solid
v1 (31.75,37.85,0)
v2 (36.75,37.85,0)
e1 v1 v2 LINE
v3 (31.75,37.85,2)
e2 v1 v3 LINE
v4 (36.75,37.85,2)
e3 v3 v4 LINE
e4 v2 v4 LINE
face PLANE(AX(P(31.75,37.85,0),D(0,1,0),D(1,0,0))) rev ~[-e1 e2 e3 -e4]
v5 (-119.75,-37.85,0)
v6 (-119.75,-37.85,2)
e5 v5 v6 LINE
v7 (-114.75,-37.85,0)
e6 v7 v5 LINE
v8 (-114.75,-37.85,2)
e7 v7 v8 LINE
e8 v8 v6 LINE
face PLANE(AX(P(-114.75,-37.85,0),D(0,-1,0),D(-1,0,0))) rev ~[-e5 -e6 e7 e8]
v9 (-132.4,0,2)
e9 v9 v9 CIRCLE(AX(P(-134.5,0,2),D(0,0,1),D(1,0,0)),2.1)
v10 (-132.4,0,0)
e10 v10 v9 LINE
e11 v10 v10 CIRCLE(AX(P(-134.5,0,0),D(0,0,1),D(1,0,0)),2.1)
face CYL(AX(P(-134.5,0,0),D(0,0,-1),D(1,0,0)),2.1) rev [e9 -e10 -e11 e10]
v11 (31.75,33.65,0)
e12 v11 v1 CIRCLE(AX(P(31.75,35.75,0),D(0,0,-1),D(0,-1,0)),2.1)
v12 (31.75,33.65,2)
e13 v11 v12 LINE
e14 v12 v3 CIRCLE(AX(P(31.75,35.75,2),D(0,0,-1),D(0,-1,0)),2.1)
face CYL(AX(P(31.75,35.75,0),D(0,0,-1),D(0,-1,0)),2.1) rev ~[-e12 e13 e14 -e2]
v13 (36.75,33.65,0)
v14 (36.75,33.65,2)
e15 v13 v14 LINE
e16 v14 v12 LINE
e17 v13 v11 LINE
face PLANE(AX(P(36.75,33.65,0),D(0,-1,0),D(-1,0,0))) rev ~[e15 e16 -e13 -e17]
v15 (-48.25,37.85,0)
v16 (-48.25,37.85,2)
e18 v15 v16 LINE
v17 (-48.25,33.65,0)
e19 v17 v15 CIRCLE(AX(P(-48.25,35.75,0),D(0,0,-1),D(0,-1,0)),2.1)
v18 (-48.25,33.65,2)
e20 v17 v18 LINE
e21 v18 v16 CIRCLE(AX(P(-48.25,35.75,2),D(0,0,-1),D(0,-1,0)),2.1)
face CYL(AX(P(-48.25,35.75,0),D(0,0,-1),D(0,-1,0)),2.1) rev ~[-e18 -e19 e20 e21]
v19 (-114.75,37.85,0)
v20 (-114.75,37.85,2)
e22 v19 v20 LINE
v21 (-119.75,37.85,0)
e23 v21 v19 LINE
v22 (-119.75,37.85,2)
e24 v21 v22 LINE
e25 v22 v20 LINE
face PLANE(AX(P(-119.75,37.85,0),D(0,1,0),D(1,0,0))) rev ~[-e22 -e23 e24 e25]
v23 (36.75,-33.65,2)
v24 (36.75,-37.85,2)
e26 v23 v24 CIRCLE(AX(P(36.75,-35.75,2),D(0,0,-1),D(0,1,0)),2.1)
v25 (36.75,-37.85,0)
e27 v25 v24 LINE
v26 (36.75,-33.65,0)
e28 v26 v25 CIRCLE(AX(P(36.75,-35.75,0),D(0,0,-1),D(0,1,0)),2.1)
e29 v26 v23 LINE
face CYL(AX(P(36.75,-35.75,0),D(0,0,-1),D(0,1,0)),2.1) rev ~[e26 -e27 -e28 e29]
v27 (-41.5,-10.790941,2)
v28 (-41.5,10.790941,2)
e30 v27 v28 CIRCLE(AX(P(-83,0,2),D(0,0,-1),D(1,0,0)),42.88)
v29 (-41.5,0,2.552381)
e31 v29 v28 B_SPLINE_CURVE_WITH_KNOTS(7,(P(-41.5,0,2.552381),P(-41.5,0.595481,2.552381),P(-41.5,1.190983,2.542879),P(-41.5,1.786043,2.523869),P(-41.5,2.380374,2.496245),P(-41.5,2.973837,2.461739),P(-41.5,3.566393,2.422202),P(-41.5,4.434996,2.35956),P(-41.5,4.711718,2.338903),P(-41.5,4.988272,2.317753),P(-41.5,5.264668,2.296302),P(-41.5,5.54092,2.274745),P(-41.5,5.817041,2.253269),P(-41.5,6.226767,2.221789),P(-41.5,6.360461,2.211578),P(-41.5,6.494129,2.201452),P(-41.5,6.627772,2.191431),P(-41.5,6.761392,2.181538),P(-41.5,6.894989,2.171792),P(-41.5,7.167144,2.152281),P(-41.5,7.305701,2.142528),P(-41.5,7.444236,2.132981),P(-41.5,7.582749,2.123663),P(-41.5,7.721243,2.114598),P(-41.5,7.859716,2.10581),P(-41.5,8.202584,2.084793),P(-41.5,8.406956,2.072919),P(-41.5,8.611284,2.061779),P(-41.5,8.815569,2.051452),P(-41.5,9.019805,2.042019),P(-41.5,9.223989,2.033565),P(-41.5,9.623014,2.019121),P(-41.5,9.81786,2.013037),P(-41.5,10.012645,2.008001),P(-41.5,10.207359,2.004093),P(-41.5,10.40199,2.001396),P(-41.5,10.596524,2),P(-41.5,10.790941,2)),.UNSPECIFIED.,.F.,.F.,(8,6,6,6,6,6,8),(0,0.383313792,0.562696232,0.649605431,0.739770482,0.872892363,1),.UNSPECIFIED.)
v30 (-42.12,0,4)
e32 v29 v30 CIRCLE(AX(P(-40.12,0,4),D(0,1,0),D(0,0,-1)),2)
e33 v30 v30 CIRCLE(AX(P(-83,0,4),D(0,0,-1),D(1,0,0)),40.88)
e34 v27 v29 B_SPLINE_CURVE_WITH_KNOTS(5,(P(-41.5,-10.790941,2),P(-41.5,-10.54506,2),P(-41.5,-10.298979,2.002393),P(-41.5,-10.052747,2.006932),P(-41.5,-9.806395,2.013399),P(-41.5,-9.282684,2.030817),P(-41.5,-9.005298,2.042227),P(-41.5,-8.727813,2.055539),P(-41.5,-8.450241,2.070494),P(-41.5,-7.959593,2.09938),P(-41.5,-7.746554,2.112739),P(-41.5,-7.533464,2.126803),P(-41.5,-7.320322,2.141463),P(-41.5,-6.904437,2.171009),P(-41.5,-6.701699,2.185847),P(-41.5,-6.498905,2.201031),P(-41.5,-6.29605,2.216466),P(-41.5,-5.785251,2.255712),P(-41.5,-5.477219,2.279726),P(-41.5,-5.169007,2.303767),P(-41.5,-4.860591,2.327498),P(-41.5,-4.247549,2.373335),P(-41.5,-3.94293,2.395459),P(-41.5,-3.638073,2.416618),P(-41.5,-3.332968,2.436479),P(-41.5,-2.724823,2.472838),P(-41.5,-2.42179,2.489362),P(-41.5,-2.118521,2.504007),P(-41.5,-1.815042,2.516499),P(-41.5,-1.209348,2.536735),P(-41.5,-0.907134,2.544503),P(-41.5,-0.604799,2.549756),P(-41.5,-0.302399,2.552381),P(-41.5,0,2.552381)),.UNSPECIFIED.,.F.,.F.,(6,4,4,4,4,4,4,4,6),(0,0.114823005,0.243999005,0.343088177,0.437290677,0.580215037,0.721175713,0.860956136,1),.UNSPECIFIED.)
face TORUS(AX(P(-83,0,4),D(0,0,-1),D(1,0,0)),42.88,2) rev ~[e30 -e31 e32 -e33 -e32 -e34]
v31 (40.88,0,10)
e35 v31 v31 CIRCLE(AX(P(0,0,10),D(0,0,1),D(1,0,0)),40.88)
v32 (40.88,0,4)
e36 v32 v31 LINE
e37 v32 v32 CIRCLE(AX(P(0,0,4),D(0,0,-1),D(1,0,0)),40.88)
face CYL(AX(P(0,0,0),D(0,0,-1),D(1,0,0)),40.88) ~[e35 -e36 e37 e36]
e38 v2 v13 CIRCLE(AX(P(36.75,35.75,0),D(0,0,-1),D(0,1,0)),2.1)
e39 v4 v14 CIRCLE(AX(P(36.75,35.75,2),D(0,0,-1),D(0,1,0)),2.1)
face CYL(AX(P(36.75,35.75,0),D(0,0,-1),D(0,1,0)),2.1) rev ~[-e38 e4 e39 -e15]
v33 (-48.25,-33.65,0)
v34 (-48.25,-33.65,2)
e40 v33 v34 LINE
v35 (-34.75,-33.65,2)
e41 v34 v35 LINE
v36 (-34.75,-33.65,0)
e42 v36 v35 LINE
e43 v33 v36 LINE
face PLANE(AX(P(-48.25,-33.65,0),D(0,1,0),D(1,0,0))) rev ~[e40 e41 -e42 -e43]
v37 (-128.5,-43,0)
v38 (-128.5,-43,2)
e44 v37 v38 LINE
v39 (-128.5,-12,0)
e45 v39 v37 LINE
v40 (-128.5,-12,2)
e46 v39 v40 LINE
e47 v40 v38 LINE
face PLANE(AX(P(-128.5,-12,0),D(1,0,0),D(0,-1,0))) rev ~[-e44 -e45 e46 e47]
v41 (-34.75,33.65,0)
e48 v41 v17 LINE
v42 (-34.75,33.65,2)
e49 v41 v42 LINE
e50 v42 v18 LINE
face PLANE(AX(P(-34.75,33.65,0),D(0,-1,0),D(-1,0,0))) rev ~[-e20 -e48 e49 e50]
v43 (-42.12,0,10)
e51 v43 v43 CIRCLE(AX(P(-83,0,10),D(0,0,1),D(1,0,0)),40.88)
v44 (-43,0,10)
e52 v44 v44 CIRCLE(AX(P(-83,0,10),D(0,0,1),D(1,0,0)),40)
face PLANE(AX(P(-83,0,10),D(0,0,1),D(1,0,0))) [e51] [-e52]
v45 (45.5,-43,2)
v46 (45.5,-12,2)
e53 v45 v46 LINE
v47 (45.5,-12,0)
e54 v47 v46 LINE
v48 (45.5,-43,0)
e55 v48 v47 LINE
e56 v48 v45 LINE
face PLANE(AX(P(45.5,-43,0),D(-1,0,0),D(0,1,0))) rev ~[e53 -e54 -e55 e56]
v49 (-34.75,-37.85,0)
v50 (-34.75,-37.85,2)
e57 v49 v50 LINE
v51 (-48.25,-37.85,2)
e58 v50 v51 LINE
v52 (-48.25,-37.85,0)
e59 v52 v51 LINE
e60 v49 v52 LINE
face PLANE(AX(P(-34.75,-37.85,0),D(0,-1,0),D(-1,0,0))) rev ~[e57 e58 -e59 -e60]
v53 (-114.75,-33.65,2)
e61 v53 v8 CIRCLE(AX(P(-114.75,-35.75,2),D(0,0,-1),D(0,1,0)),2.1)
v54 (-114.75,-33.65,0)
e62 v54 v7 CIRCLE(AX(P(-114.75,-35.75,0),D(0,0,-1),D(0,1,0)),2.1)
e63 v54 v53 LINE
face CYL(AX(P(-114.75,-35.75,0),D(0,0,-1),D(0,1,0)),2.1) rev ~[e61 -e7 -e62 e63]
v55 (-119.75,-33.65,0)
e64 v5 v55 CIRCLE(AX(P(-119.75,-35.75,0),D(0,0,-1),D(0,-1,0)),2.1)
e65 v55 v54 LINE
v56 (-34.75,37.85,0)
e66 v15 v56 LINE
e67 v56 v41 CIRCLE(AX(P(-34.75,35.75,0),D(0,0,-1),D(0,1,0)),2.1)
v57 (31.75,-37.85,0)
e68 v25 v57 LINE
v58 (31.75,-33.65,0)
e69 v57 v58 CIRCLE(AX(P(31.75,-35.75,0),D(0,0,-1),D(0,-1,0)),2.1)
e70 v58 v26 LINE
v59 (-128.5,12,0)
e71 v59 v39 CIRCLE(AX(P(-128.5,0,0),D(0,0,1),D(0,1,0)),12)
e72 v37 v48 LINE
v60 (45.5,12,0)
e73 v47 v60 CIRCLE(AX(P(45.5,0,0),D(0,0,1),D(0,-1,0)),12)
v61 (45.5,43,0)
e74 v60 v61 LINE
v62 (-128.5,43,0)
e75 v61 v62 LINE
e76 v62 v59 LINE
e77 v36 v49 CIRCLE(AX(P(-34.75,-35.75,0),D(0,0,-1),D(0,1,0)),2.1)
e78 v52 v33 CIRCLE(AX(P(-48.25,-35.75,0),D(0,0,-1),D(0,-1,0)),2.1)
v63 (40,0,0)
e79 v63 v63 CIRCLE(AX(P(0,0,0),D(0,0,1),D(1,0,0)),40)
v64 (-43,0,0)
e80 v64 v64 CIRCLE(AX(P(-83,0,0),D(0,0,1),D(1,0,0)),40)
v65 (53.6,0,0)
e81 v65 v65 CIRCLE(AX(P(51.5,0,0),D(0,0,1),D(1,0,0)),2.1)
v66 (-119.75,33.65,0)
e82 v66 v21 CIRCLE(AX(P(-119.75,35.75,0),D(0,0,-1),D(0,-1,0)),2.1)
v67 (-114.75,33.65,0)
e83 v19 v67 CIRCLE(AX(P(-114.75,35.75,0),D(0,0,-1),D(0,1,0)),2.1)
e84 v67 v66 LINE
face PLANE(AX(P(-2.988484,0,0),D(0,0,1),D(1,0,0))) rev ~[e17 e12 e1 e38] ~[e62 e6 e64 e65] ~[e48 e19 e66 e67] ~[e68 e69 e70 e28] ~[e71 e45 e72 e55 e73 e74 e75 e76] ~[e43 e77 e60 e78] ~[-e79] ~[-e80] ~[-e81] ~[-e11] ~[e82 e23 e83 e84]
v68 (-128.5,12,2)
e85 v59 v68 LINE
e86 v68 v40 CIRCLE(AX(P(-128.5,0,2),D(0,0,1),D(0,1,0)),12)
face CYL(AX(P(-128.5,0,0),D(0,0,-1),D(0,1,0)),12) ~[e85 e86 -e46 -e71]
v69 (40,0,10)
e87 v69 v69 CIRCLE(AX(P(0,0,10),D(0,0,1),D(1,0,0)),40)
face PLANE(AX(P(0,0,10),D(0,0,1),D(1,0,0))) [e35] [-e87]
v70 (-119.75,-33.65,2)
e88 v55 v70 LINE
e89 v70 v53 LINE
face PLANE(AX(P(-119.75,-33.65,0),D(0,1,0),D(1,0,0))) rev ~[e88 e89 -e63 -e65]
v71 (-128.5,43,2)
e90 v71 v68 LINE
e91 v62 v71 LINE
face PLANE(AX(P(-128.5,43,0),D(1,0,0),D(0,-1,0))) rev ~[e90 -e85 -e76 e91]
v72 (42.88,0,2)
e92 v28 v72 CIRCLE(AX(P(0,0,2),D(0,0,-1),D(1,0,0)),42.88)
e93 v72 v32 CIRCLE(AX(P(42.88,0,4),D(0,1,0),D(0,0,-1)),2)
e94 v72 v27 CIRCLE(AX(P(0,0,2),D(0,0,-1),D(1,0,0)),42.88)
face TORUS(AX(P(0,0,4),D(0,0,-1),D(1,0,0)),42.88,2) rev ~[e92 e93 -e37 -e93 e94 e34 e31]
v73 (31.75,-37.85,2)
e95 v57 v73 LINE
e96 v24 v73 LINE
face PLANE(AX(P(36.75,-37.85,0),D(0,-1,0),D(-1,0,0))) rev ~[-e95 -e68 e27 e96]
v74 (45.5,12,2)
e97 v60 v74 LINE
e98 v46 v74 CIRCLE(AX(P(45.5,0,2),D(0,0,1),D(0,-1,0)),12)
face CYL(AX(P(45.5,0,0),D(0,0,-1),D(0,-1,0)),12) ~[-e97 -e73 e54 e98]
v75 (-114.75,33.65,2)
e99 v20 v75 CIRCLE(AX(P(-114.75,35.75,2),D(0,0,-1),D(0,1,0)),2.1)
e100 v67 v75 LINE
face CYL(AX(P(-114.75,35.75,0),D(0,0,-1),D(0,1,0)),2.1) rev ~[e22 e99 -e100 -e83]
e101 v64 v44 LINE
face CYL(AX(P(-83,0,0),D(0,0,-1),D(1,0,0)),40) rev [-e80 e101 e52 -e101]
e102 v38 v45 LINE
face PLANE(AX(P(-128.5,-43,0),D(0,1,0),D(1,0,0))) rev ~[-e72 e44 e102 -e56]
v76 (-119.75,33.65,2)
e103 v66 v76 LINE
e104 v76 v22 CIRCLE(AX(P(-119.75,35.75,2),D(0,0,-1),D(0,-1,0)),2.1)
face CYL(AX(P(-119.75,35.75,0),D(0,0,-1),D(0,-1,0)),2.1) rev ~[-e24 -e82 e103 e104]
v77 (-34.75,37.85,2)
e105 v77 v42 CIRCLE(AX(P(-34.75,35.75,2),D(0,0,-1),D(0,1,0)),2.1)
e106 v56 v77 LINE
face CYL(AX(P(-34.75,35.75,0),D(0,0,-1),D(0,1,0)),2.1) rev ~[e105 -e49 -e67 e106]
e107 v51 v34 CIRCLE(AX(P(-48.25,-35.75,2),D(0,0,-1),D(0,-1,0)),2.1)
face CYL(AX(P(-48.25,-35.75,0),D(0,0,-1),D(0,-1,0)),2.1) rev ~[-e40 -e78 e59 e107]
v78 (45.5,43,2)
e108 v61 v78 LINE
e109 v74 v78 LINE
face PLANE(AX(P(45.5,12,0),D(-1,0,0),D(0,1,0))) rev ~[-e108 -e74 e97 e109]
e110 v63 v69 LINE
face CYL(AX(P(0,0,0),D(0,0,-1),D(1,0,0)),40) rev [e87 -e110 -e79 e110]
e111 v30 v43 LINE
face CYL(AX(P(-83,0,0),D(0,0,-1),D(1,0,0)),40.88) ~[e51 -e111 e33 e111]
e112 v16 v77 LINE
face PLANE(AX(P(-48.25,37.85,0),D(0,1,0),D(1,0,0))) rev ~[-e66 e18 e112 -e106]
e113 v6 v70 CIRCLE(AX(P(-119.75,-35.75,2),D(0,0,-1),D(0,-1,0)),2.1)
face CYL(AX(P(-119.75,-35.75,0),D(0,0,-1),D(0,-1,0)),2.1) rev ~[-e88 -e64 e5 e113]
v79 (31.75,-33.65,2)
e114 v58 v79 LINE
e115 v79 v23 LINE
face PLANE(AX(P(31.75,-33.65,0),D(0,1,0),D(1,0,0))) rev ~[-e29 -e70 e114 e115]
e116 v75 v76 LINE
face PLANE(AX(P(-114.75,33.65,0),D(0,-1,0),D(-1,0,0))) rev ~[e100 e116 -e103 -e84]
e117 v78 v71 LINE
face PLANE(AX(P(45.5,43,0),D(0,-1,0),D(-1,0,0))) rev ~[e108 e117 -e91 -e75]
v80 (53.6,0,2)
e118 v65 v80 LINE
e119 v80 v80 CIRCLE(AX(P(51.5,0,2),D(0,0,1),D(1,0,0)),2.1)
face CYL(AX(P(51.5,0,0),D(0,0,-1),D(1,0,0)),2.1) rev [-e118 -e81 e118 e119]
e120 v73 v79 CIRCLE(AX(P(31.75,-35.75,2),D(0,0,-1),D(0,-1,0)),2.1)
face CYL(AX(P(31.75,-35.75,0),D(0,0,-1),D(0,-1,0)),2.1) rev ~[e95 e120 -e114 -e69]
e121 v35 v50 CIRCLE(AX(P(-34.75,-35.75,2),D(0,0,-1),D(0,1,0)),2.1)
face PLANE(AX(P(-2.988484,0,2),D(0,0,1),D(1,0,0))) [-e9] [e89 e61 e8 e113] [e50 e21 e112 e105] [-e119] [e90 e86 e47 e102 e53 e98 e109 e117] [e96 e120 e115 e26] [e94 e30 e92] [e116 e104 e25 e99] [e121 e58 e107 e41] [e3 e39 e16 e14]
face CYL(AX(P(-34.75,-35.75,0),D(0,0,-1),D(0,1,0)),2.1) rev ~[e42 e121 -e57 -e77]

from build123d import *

# Parameters (mm, degrees)
F0_R     = 40.88
F0_R_2   = 2.1
F0_R_3   = 40
F1_DEPTH = 2
F2_DEPTH = 10


# Not quite as in the source:
# - a fillet or chamfer that OpenCascade refuses, or shapes differently, is made with other operations: its cross-section is extruded or revolved along the edge and cut away or added


with BuildPart() as f1:
    # F0 (on Top) → F1 (new body)
    with BuildSketch(Plane.XY):
        with BuildLine():
            Line((-41.5, -43), (41.5, -43))
            Line((41.5, -43), (41.5, 43))
            Line((41.5, 43), (-41.5, 43))
            Line((-41.5, 43), (-41.5, 37.85))
            Line((-41.5, 37.85), (-34.75, 37.85))
            ThreePointArc((-34.75, 37.85), (-32.65, 35.75), (-34.75, 33.65))
            Line((-34.75, 33.65), (-41.5, 33.65))
            Line((-41.5, 33.65), (-41.5, -33.65))
            Line((-41.5, -33.65), (-34.75, -33.65))
            ThreePointArc((-34.75, -33.65), (-32.65, -35.75), (-34.75, -37.85))
            Line((-34.75, -37.85), (-41.5, -37.85))
            Line((-41.5, -37.85), (-41.5, -43))
        make_face()
        with BuildLine():
            ThreePointArc((36.75, -33.65), (38.85, -35.75), (36.75, -37.85))
            Line((36.75, -37.85), (31.75, -37.85))
            ThreePointArc((31.75, -37.85), (29.65, -35.75), (31.75, -33.65))
            Line((31.75, -33.65), (36.75, -33.65))
        make_face(mode=Mode.SUBTRACT)
        Circle(F0_R, mode=Mode.SUBTRACT)
        with BuildLine():
            Line((31.75, 37.85), (36.75, 37.85))
            ThreePointArc((36.75, 37.85), (38.85, 35.75), (36.75, 33.65))
            Line((36.75, 33.65), (31.75, 33.65))
            ThreePointArc((31.75, 33.65), (29.65, 35.75), (31.75, 37.85))
        make_face(mode=Mode.SUBTRACT)
        Polygon((41.5, 43), (41.5, -43), (45.5, -43), (45.5, -12), (45.5, 12), (45.5, 43), align=None)
        with BuildLine():
            Line((-124.5, -43), (-41.5, -43))
            Line((-41.5, -43), (-41.5, -37.85))
            Line((-41.5, -37.85), (-48.25, -37.85))
            ThreePointArc((-48.25, -37.85), (-50.35, -35.75), (-48.25, -33.65))
            Line((-48.25, -33.65), (-41.5, -33.65))
            Line((-41.5, -33.65), (-41.5, 33.65))
            Line((-41.5, 33.65), (-48.25, 33.65))
            ThreePointArc((-48.25, 33.65), (-50.35, 35.75), (-48.25, 37.85))
            Line((-48.25, 37.85), (-41.5, 37.85))
            Line((-41.5, 37.85), (-41.5, 43))
            Line((-41.5, 43), (-124.5, 43))
            Line((-124.5, 43), (-124.5, -43))
        make_face()
        with BuildLine():
            Line((-114.75, -37.85), (-119.75, -37.85))
            ThreePointArc((-119.75, -37.85), (-121.85, -35.75), (-119.75, -33.65))
            Line((-119.75, -33.65), (-114.75, -33.65))
            ThreePointArc((-114.75, -33.65), (-112.65, -35.75), (-114.75, -37.85))
        make_face(mode=Mode.SUBTRACT)
        with Locations((-83, 0)):
            Circle(F0_R, mode=Mode.SUBTRACT)
        with BuildLine():
            ThreePointArc((-119.75, 33.65), (-121.85, 35.75), (-119.75, 37.85))
            Line((-119.75, 37.85), (-114.75, 37.85))
            ThreePointArc((-114.75, 37.85), (-112.65, 35.75), (-114.75, 33.65))
            Line((-114.75, 33.65), (-119.75, 33.65))
        make_face(mode=Mode.SUBTRACT)
        Polygon((-128.5, -43), (-124.5, -43), (-124.5, 43), (-128.5, 43), (-128.5, 12), (-128.5, -12), align=None)
        with BuildLine():
            Line((45.5, 12), (45.5, -12))
            ThreePointArc((45.5, -12), (57.5, 0), (45.5, 12))
        make_face()
        with Locations((51.5, 0)):
            Circle(F0_R_2, mode=Mode.SUBTRACT)
        with BuildLine():
            ThreePointArc((-128.5, 12), (-140.5, 0), (-128.5, -12))
            Line((-128.5, -12), (-128.5, 12))
        make_face()
        with Locations((-134.5, 0)):
            Circle(F0_R_2, mode=Mode.SUBTRACT)
        Circle(F0_R)
        Circle(F0_R_3, mode=Mode.SUBTRACT)
        with Locations((-83, 0)):
            Circle(F0_R)
        with Locations((-83, 0)):
            Circle(F0_R_3, mode=Mode.SUBTRACT)
    extrude(amount=F1_DEPTH)

    # F0 (on Top) → F2 (join)
    with BuildSketch(Plane.XY):
        Circle(F0_R)
        Circle(F0_R_3, mode=Mode.SUBTRACT)
        with Locations((-83, 0)):
            Circle(F0_R)
        with Locations((-83, 0)):
            Circle(F0_R_3, mode=Mode.SUBTRACT)
    extrude(amount=F2_DEPTH)

    # F3: fillet of radius 2 on 2 edges, made by hand

    # F3_s1 → F3_t2 (revolve)
    with BuildSketch(Plane.XZ):
        with BuildLine():
            ThreePointArc((-40.12, 2), (-41.5342135624, 2.5857864376), (-42.12, 4))
            Line((-42.12, 4), (-42.12, 2))
            Line((-42.12, 2), (-40.12, 2))
        make_face()
    revolve(axis=Axis((-83, 0, 2), (0, 0, -1)))

    # F3_s3 → F3_t4 (revolve)
    with BuildSketch(Plane.XZ):
        with BuildLine():
            ThreePointArc((42.88, 2), (41.4657864376, 2.5857864376), (40.88, 4))
            Line((40.88, 4), (40.88, 2))
            Line((40.88, 2), (42.88, 2))
        make_face()
    revolve(axis=Axis((0, 0, 2), (0, 0, -1)))


solid = f1.part
